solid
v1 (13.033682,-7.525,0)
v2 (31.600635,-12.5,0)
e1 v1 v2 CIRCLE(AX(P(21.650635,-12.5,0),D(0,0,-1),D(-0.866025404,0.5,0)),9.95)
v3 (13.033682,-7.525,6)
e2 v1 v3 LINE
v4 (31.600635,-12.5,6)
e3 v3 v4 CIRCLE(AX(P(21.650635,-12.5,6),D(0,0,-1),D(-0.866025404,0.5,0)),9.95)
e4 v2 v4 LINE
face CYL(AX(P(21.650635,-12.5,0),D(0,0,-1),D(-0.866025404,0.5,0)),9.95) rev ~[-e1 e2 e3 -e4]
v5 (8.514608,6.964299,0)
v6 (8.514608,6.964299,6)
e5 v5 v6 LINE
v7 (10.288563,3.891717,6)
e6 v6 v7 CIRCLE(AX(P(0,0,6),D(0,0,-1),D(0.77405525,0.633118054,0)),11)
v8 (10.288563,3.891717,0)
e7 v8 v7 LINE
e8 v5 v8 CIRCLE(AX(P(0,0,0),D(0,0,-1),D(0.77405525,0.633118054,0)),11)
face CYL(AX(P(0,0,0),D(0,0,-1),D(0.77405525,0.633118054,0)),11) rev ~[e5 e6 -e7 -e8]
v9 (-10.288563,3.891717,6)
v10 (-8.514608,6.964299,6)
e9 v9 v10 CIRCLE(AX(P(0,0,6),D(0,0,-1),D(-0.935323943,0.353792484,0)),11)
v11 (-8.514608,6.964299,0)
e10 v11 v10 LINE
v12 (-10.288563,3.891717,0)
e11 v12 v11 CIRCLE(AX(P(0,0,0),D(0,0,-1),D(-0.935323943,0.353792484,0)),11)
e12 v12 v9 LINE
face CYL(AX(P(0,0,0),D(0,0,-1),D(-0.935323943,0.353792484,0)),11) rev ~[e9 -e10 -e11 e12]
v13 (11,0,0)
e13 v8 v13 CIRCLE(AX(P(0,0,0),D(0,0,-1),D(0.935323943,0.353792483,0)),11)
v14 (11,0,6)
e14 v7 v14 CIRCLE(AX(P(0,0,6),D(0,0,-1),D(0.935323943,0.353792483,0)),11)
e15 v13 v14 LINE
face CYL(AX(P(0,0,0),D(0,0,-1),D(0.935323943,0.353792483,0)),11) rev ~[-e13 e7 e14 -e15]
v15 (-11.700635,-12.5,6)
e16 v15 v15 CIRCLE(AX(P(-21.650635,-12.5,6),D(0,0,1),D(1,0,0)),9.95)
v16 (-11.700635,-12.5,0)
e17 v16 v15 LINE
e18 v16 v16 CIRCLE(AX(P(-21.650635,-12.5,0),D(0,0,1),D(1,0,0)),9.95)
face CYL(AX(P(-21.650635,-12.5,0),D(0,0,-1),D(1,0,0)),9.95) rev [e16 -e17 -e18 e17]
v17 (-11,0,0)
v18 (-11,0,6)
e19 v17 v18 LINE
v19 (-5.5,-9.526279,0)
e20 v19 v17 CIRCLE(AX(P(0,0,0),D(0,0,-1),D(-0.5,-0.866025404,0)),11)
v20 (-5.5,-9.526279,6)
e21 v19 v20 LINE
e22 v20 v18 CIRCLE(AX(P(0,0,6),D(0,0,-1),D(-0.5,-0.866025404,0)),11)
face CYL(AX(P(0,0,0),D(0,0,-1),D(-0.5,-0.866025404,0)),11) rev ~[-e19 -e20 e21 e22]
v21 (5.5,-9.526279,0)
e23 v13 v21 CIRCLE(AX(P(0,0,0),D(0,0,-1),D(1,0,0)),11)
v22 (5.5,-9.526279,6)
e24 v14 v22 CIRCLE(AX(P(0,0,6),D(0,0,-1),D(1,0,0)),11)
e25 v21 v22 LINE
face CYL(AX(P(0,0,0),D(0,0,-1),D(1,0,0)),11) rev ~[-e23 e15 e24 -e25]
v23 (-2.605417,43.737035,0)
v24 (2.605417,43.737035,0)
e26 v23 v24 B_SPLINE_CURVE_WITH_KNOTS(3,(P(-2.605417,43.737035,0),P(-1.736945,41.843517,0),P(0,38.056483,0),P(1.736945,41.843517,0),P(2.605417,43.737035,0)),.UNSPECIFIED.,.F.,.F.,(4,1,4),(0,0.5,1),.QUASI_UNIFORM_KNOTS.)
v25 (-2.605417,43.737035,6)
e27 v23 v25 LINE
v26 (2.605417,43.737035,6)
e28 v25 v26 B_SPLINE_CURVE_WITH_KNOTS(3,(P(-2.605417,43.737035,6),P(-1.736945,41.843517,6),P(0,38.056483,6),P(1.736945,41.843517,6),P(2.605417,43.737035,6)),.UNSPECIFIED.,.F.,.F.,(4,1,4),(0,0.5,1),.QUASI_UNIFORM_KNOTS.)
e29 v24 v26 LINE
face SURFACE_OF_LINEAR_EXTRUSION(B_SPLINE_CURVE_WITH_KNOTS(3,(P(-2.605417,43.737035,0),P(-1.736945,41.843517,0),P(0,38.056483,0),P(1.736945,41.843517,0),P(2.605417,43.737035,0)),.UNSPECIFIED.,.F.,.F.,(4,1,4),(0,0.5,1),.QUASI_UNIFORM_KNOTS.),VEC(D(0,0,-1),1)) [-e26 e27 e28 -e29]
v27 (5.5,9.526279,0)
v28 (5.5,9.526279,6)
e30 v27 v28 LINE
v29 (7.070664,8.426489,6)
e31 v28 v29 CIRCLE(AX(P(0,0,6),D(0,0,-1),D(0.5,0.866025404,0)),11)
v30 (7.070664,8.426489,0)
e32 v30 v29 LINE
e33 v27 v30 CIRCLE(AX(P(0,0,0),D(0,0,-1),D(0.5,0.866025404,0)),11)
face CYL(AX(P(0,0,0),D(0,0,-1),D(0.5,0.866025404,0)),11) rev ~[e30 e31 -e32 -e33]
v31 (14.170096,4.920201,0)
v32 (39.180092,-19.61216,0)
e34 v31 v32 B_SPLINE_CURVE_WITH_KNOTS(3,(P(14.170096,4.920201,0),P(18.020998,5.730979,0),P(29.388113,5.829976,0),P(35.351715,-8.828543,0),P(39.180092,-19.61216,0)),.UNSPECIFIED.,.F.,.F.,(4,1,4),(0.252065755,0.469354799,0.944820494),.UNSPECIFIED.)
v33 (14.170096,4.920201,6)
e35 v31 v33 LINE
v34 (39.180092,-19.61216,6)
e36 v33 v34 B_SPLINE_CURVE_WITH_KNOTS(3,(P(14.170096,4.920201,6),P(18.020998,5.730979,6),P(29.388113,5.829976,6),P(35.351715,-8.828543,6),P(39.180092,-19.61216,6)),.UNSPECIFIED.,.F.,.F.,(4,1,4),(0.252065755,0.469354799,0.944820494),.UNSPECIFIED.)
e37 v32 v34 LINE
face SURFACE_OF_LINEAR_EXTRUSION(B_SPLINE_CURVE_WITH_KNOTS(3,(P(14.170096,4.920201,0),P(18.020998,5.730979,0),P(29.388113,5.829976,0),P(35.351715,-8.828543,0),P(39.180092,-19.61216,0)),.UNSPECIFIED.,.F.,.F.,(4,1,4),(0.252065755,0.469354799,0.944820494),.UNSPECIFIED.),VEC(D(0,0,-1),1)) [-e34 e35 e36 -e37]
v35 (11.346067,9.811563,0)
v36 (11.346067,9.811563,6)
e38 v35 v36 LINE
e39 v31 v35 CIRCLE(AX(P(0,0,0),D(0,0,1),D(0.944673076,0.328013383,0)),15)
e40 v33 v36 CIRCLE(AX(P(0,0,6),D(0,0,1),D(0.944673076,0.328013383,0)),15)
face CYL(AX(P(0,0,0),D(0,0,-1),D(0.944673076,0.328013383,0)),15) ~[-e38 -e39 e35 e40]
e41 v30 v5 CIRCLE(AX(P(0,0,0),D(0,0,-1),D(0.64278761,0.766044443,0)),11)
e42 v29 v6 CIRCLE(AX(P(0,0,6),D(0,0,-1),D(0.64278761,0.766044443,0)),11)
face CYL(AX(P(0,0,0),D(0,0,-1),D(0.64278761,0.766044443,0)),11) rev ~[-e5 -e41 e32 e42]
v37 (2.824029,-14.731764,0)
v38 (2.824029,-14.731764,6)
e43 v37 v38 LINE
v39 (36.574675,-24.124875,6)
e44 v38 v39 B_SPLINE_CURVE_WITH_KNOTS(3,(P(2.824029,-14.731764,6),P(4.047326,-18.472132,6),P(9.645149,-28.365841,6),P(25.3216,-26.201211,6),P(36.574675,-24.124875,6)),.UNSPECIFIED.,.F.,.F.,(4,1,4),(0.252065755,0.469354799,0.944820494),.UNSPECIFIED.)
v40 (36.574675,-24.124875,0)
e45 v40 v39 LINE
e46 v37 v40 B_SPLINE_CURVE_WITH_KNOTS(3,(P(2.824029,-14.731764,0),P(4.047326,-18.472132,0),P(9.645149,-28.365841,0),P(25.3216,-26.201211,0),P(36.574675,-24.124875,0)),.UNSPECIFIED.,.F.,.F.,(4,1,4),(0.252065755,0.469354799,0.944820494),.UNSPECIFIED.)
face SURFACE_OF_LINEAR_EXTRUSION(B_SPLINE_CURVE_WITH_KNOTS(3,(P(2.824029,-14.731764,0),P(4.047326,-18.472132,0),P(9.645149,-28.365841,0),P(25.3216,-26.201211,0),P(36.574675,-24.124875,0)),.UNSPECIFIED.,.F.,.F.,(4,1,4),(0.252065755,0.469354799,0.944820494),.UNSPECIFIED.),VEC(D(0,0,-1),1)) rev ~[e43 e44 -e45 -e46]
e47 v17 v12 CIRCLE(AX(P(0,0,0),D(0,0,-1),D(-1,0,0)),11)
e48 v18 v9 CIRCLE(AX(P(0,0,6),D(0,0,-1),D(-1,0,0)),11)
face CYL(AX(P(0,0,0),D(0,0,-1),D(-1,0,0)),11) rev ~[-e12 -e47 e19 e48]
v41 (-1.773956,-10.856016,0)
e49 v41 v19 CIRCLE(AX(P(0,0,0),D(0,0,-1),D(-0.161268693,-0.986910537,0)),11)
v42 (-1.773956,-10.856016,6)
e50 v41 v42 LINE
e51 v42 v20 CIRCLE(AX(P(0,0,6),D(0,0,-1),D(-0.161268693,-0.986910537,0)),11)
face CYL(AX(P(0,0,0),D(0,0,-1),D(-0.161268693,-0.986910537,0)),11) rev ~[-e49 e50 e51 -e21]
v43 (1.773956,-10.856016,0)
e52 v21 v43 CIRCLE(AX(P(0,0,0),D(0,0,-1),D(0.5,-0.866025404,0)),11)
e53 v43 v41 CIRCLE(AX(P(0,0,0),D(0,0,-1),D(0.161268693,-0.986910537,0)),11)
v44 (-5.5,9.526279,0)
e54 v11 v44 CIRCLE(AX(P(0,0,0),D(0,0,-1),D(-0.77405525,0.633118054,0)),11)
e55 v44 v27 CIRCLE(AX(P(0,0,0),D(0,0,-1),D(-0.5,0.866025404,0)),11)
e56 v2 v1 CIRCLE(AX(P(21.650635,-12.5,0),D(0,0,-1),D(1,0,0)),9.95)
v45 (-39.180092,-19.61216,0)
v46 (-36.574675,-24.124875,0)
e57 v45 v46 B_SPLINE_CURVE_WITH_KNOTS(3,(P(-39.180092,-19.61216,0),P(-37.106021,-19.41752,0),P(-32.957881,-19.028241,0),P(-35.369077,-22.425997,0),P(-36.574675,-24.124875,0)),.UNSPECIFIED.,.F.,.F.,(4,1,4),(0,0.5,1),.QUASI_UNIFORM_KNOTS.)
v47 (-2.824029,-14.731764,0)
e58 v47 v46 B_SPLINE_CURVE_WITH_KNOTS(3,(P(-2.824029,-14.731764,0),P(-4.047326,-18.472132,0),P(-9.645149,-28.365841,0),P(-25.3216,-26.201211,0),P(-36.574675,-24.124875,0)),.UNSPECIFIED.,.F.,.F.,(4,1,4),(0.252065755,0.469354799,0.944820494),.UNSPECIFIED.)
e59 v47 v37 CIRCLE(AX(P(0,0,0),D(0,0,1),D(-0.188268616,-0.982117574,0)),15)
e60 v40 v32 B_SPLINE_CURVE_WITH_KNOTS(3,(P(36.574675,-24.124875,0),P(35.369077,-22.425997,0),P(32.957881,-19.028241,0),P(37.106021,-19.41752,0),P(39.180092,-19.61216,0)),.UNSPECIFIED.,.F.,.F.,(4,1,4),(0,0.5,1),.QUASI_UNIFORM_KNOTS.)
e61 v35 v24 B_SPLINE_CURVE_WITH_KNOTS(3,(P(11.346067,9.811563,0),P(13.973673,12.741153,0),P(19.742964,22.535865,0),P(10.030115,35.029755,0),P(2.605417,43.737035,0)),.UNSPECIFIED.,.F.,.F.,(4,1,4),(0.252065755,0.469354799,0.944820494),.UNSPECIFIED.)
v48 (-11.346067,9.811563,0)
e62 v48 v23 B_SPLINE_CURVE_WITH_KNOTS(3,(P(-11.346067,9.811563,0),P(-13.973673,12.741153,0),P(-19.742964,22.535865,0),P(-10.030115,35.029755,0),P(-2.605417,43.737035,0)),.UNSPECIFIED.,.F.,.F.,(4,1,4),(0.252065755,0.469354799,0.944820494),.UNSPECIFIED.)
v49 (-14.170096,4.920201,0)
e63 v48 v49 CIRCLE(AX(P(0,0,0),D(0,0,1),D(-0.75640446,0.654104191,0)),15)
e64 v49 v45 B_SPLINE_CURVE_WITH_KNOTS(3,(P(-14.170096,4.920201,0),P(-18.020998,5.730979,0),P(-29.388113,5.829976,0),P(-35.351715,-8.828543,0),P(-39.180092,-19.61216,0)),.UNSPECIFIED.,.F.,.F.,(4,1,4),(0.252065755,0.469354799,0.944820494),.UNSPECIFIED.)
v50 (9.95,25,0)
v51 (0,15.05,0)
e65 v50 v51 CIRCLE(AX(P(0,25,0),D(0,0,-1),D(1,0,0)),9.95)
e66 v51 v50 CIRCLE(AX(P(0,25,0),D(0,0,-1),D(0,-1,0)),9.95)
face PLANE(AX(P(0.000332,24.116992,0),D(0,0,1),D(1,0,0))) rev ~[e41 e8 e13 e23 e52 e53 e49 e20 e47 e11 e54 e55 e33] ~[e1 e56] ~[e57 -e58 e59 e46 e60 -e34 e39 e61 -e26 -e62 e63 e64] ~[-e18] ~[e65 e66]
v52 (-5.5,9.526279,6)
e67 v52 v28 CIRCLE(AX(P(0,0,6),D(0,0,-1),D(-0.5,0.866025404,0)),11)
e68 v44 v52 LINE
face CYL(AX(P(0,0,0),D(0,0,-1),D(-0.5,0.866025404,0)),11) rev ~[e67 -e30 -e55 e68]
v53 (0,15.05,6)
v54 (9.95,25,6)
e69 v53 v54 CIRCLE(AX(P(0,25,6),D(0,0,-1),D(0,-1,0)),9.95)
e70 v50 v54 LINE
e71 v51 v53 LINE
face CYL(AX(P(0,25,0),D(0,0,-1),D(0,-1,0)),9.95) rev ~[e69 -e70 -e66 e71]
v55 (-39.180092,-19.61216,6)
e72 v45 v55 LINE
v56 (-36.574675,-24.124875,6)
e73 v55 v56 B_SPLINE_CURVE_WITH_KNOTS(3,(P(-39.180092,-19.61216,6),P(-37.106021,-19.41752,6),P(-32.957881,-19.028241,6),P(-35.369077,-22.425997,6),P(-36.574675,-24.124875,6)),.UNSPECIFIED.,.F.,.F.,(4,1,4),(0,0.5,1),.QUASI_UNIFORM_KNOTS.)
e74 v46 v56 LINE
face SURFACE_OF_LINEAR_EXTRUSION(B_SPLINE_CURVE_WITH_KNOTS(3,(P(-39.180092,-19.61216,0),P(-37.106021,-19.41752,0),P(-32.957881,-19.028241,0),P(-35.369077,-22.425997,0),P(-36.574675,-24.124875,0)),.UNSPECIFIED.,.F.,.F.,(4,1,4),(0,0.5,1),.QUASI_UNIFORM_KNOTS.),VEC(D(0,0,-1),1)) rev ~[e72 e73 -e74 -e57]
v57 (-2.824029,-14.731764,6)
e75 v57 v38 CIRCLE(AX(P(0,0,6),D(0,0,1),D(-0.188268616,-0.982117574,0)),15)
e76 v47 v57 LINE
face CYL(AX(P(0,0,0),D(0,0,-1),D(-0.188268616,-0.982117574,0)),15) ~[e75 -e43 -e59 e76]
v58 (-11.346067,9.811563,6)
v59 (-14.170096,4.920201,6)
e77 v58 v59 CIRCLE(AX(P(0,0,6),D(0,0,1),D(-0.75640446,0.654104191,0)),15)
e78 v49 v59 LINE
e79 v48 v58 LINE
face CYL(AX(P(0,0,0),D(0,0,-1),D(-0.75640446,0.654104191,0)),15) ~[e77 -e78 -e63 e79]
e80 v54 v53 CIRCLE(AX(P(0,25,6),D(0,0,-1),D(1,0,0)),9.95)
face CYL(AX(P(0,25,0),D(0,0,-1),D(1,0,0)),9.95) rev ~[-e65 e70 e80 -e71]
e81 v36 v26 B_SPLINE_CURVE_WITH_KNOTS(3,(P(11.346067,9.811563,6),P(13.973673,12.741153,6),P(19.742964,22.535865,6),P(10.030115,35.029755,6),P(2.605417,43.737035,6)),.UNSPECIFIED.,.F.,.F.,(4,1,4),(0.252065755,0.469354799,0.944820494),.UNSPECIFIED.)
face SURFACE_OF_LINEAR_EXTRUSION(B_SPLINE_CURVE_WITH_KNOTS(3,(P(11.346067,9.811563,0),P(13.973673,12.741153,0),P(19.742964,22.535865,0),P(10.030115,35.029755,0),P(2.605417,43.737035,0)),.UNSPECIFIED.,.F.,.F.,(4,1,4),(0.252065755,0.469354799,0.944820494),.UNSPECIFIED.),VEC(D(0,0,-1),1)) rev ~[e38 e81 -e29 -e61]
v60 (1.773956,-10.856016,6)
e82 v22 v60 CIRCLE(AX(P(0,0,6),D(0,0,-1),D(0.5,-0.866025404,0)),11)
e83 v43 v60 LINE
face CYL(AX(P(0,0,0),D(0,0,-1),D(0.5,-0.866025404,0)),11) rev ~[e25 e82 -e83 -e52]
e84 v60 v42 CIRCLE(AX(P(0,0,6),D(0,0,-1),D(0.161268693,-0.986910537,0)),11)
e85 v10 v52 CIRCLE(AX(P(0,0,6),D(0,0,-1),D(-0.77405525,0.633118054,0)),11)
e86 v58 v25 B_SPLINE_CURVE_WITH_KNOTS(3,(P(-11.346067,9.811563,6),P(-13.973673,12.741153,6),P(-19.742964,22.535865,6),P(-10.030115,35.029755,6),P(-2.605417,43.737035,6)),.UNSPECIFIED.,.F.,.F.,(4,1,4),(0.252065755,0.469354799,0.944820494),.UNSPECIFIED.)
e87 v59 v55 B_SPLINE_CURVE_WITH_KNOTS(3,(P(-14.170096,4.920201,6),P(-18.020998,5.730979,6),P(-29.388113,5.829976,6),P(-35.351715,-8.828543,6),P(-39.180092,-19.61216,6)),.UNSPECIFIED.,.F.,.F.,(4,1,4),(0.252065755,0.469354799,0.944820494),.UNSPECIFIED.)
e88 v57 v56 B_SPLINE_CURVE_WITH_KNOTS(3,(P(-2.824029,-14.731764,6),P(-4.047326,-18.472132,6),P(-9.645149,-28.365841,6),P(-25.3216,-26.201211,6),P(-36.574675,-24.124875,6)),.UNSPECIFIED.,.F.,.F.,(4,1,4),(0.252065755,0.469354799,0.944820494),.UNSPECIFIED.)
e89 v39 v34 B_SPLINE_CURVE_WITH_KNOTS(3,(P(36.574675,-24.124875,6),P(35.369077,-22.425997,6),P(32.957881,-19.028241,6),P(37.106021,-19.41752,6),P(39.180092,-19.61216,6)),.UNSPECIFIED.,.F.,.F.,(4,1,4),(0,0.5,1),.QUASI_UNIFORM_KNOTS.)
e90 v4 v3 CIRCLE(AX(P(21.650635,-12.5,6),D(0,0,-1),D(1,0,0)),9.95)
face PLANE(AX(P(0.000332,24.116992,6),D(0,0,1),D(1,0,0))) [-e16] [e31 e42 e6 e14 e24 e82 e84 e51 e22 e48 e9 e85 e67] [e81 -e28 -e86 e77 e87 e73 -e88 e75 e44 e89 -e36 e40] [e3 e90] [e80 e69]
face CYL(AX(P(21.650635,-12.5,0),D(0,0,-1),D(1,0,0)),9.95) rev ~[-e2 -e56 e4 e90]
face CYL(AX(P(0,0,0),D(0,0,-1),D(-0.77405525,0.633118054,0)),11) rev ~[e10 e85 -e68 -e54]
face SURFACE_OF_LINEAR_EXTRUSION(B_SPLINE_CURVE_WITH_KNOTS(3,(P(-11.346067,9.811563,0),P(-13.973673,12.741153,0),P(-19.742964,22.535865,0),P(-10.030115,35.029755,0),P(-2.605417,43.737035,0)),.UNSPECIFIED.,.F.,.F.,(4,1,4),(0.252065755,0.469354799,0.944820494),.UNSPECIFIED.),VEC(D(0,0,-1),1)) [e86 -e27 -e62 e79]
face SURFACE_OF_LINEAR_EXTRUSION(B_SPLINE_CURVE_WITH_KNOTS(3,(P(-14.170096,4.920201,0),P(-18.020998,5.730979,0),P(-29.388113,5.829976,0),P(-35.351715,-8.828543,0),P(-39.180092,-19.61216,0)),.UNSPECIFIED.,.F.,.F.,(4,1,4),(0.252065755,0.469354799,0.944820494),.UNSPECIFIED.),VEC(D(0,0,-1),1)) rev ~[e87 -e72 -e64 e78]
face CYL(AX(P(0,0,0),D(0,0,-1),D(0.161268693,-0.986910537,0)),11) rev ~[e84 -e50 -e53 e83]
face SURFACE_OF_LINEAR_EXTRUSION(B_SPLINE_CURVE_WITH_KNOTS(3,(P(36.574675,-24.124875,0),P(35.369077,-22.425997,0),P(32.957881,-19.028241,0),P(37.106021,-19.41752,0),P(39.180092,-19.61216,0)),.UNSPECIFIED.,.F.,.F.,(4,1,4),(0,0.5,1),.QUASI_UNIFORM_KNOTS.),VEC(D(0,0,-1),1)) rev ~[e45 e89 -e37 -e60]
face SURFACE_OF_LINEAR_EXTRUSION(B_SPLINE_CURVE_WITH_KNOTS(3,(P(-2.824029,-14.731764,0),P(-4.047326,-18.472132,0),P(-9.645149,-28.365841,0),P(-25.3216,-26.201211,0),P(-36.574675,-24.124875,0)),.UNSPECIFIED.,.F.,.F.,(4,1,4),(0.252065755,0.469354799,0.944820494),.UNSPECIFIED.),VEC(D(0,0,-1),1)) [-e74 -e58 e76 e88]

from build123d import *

# Parameters (mm, degrees)
F0_R     = 9.95
F1_DEPTH = 6


with BuildPart() as f1:
    # F0 (on Top) → F1 (new body)
    with BuildSketch(Plane.XY):
        with BuildLine():
            ThreePointArc((5.5, 9.5262794416), (6.3093407999, 9.0106724872), (7.0706637066, 8.4264888743))
            ThreePointArc((7.0706637066, 8.4264888743), (7.8268557987, 7.7291867817), (8.5146077493, 6.9642985918))
            add(Edge.make_bspline(
                [(8.5146077493, 6.9642985918), (9.5301249028, 7.9008868503), (10.4822945034, 8.8485192108), (11.3460669028, 9.8115628642)],
                knots=[0.1806363612, 0.1806363612, 0.1806363612, 0.1806363612, 0.2520657546, 0.2520657546, 0.2520657546, 0.2520657546], degree=3))
            add(Edge.make_bspline(
                [(11.3460669028, 9.8115628642), (13.9736725709, 12.7411528396), (19.7429640918, 22.5358646022), (10.0301146668, 35.0297546933), (2.6054169788, 43.7370347171)],
                knots=[0.2520657546, 0.2520657546, 0.2520657546, 0.2520657546, 0.4693547987, 0.9448204936, 0.9448204936, 0.9448204936, 0.9448204936], degree=3))
            add(Edge.make_bspline(
                [(-2.6054169788, 43.7370347171), (-1.7369446525, 41.8435173586), (0, 38.0564826414), (1.7369446525, 41.8435173586), (2.6054169788, 43.7370347171)],
                knots=[0, 0, 0, 0, 0.5, 1, 1, 1, 1], degree=3))
            add(Edge.make_bspline(
                [(-11.3460669028, 9.8115628642), (-13.9736725709, 12.7411528396), (-19.7429640918, 22.5358646022), (-10.0301146668, 35.0297546933), (-2.6054169788, 43.7370347171)],
                knots=[0.2520657546, 0.2520657546, 0.2520657546, 0.2520657546, 0.4693547987, 0.9448204936, 0.9448204936, 0.9448204936, 0.9448204936], degree=3))
            add(Edge.make_bspline(
                [(-8.5146077493, 6.9642985918), (-9.5301249028, 7.9008868503), (-10.4822945034, 8.8485192108), (-11.3460669028, 9.8115628642)],
                knots=[0.1806363612, 0.1806363612, 0.1806363612, 0.1806363612, 0.2520657546, 0.2520657546, 0.2520657546, 0.2520657546], degree=3))
            ThreePointArc((-8.5146077493, 6.9642985918), (-7.1234292346, 8.381930323), (-5.5, 9.5262794416))
            ThreePointArc((-5.5, 9.5262794416), (0, 11), (5.5, 9.5262794416))
        make_face()
        with BuildLine():
            ThreePointArc((0, 15.05), (-7.0357124728, 32.0357124728), (9.95, 25))
            ThreePointArc((9.95, 25), (7.0357124728, 17.9642875272), (0, 15.05))
        make_face(mode=Mode.SUBTRACT)
        with BuildLine():
            add(Edge.make_bspline(
                [(8.5146077493, 6.9642985918), (9.5301249028, 7.9008868503), (10.4822945034, 8.8485192108), (11.3460669028, 9.8115628642)],
                knots=[0.1806363612, 0.1806363612, 0.1806363612, 0.1806363612, 0.2520657546, 0.2520657546, 0.2520657546, 0.2520657546], degree=3))
            ThreePointArc((8.5146077493, 6.9642985918), (9.5262794416, 5.5), (10.2885633747, 3.8917173182))
            add(Edge.make_bspline(
                [(10.2885633747, 3.8917173182), (11.6074311762, 4.3028868419), (12.9041896741, 4.6536737245), (14.1700961426, 4.9202007387)],
                knots=[0.1806363612, 0.1806363612, 0.1806363612, 0.1806363612, 0.2520657546, 0.2520657546, 0.2520657546, 0.2520657546], degree=3))
            ThreePointArc((14.1700961426, 4.9202007387), (12.9903810568, 7.5), (11.3460669028, 9.8115628642))
        make_face()
        with BuildLine():
            add(Edge.make_bspline(
                [(10.2885633747, 3.8917173182), (11.6074311762, 4.3028868419), (12.9041896741, 4.6536737245), (14.1700961426, 4.9202007387)],
                knots=[0.1806363612, 0.1806363612, 0.1806363612, 0.1806363612, 0.2520657546, 0.2520657546, 0.2520657546, 0.2520657546], degree=3))
            ThreePointArc((10.2885633747, 3.8917173182), (10.8206792098, 1.9781055177), (11, 0))
            ThreePointArc((11, 0), (9.5262794416, -5.5), (5.5, -9.5262794416))
            ThreePointArc((5.5, -9.5262794416), (3.6972499752, -10.3600358407), (1.7739556254, -10.85601591))
            add(Edge.make_bspline(
                [(1.7739556254, -10.85601591), (2.0773062734, -12.2037736923), (2.4218951707, -13.5021929353), (2.8240292398, -14.7317636029)],
                knots=[0.1806363612, 0.1806363612, 0.1806363612, 0.1806363612, 0.2520657546, 0.2520657546, 0.2520657546, 0.2520657546], degree=3))
            add(Edge.make_bspline(
                [(2.8240292398, -14.7317636029), (4.0473257472, -18.4721318504), (9.6451491958, -28.3658407506), (25.3216001194, -26.201211451), (36.5746746618, -24.1248746496)],
                knots=[0.2520657546, 0.2520657546, 0.2520657546, 0.2520657546, 0.4693547987, 0.9448204936, 0.9448204936, 0.9448204936, 0.9448204936], degree=3))
            add(Edge.make_bspline(
                [(36.5746746618, -24.1248746496), (35.3690766899, -22.4259968733), (32.9578807462, -19.0282413207), (37.1060213425, -19.4175204852), (39.1800916406, -19.6121600675)],
                knots=[0, 0, 0, 0, 0.5, 1, 1, 1, 1], degree=3))
            add(Edge.make_bspline(
                [(14.1700961426, 4.9202007387), (18.0209983181, 5.7309790107), (29.3881132876, 5.8299761484), (35.3517147861, -8.8285432423), (39.1800916406, -19.6121600675)],
                knots=[0.2520657546, 0.2520657546, 0.2520657546, 0.2520657546, 0.4693547987, 0.9448204936, 0.9448204936, 0.9448204936, 0.9448204936], degree=3))
        make_face()
        with BuildLine():
            ThreePointArc((13.033682327, -7.525), (24.2258845934, -2.8890380284), (31.6006350946, -12.5))
            ThreePointArc((31.6006350946, -12.5), (19.0753855958, -22.1109619716), (13.033682327, -7.525))
        make_face(mode=Mode.SUBTRACT)
        with BuildLine():
            ThreePointArc((-10.2885633747, 3.8917173182), (-9.5262794416, 5.5), (-8.5146077493, 6.9642985918))
            add(Edge.make_bspline(
                [(-8.5146077493, 6.9642985918), (-9.5301249028, 7.9008868503), (-10.4822945034, 8.8485192108), (-11.3460669028, 9.8115628642)],
                knots=[0.1806363612, 0.1806363612, 0.1806363612, 0.1806363612, 0.2520657546, 0.2520657546, 0.2520657546, 0.2520657546], degree=3))
            ThreePointArc((-11.3460669028, 9.8115628642), (-12.9903810568, 7.5), (-14.1700961426, 4.9202007387))
            add(Edge.make_bspline(
                [(-10.2885633747, 3.8917173182), (-11.6074311762, 4.3028868419), (-12.9041896741, 4.6536737245), (-14.1700961426, 4.9202007387)],
                knots=[0.1806363612, 0.1806363612, 0.1806363612, 0.1806363612, 0.2520657546, 0.2520657546, 0.2520657546, 0.2520657546], degree=3))
        make_face()
        with BuildLine():
            add(Edge.make_bspline(
                [(1.7739556254, -10.85601591), (2.0773062734, -12.2037736923), (2.4218951707, -13.5021929353), (2.8240292398, -14.7317636029)],
                knots=[0.1806363612, 0.1806363612, 0.1806363612, 0.1806363612, 0.2520657546, 0.2520657546, 0.2520657546, 0.2520657546], degree=3))
            ThreePointArc((1.7739556254, -10.85601591), (0, -11), (-1.7739556254, -10.85601591))
            add(Edge.make_bspline(
                [(-1.7739556254, -10.85601591), (-2.0773062734, -12.2037736923), (-2.4218951707, -13.5021929353), (-2.8240292398, -14.7317636029)],
                knots=[0.1806363612, 0.1806363612, 0.1806363612, 0.1806363612, 0.2520657546, 0.2520657546, 0.2520657546, 0.2520657546], degree=3))
            ThreePointArc((-2.8240292398, -14.7317636029), (0, -15), (2.8240292398, -14.7317636029))
        make_face()
        with BuildLine():
            ThreePointArc((-11, 0), (-10.8206792098, 1.9781055177), (-10.2885633747, 3.8917173182))
            add(Edge.make_bspline(
                [(-10.2885633747, 3.8917173182), (-11.6074311762, 4.3028868419), (-12.9041896741, 4.6536737245), (-14.1700961426, 4.9202007387)],
                knots=[0.1806363612, 0.1806363612, 0.1806363612, 0.1806363612, 0.2520657546, 0.2520657546, 0.2520657546, 0.2520657546], degree=3))
            add(Edge.make_bspline(
                [(-14.1700961426, 4.9202007387), (-18.0209983181, 5.7309790107), (-29.3881132876, 5.8299761484), (-35.3517147861, -8.8285432423), (-39.1800916406, -19.6121600675)],
                knots=[0.2520657546, 0.2520657546, 0.2520657546, 0.2520657546, 0.4693547987, 0.9448204936, 0.9448204936, 0.9448204936, 0.9448204936], degree=3))
            add(Edge.make_bspline(
                [(-39.1800916406, -19.6121600675), (-37.1060213425, -19.4175204852), (-32.9578807462, -19.0282413207), (-35.3690766899, -22.4259968733), (-36.5746746618, -24.1248746496)],
                knots=[0, 0, 0, 0, 0.5, 1, 1, 1, 1], degree=3))
            add(Edge.make_bspline(
                [(-2.8240292398, -14.7317636029), (-4.0473257472, -18.4721318504), (-9.6451491958, -28.3658407506), (-25.3216001194, -26.201211451), (-36.5746746618, -24.1248746496)],
                knots=[0.2520657546, 0.2520657546, 0.2520657546, 0.2520657546, 0.4693547987, 0.9448204936, 0.9448204936, 0.9448204936, 0.9448204936], degree=3))
            add(Edge.make_bspline(
                [(-1.7739556254, -10.85601591), (-2.0773062734, -12.2037736923), (-2.4218951707, -13.5021929353), (-2.8240292398, -14.7317636029)],
                knots=[0.1806363612, 0.1806363612, 0.1806363612, 0.1806363612, 0.2520657546, 0.2520657546, 0.2520657546, 0.2520657546], degree=3))
            ThreePointArc((-1.7739556254, -10.85601591), (-3.6972499752, -10.3600358407), (-5.5, -9.5262794416))
            ThreePointArc((-5.5, -9.5262794416), (-9.5262794416, -5.5), (-11, 0))
        make_face()
        with Locations((-21.6506350946, -12.5)):
            Circle(F0_R, mode=Mode.SUBTRACT)
    extrude(amount=F1_DEPTH)


solid = f1.part
